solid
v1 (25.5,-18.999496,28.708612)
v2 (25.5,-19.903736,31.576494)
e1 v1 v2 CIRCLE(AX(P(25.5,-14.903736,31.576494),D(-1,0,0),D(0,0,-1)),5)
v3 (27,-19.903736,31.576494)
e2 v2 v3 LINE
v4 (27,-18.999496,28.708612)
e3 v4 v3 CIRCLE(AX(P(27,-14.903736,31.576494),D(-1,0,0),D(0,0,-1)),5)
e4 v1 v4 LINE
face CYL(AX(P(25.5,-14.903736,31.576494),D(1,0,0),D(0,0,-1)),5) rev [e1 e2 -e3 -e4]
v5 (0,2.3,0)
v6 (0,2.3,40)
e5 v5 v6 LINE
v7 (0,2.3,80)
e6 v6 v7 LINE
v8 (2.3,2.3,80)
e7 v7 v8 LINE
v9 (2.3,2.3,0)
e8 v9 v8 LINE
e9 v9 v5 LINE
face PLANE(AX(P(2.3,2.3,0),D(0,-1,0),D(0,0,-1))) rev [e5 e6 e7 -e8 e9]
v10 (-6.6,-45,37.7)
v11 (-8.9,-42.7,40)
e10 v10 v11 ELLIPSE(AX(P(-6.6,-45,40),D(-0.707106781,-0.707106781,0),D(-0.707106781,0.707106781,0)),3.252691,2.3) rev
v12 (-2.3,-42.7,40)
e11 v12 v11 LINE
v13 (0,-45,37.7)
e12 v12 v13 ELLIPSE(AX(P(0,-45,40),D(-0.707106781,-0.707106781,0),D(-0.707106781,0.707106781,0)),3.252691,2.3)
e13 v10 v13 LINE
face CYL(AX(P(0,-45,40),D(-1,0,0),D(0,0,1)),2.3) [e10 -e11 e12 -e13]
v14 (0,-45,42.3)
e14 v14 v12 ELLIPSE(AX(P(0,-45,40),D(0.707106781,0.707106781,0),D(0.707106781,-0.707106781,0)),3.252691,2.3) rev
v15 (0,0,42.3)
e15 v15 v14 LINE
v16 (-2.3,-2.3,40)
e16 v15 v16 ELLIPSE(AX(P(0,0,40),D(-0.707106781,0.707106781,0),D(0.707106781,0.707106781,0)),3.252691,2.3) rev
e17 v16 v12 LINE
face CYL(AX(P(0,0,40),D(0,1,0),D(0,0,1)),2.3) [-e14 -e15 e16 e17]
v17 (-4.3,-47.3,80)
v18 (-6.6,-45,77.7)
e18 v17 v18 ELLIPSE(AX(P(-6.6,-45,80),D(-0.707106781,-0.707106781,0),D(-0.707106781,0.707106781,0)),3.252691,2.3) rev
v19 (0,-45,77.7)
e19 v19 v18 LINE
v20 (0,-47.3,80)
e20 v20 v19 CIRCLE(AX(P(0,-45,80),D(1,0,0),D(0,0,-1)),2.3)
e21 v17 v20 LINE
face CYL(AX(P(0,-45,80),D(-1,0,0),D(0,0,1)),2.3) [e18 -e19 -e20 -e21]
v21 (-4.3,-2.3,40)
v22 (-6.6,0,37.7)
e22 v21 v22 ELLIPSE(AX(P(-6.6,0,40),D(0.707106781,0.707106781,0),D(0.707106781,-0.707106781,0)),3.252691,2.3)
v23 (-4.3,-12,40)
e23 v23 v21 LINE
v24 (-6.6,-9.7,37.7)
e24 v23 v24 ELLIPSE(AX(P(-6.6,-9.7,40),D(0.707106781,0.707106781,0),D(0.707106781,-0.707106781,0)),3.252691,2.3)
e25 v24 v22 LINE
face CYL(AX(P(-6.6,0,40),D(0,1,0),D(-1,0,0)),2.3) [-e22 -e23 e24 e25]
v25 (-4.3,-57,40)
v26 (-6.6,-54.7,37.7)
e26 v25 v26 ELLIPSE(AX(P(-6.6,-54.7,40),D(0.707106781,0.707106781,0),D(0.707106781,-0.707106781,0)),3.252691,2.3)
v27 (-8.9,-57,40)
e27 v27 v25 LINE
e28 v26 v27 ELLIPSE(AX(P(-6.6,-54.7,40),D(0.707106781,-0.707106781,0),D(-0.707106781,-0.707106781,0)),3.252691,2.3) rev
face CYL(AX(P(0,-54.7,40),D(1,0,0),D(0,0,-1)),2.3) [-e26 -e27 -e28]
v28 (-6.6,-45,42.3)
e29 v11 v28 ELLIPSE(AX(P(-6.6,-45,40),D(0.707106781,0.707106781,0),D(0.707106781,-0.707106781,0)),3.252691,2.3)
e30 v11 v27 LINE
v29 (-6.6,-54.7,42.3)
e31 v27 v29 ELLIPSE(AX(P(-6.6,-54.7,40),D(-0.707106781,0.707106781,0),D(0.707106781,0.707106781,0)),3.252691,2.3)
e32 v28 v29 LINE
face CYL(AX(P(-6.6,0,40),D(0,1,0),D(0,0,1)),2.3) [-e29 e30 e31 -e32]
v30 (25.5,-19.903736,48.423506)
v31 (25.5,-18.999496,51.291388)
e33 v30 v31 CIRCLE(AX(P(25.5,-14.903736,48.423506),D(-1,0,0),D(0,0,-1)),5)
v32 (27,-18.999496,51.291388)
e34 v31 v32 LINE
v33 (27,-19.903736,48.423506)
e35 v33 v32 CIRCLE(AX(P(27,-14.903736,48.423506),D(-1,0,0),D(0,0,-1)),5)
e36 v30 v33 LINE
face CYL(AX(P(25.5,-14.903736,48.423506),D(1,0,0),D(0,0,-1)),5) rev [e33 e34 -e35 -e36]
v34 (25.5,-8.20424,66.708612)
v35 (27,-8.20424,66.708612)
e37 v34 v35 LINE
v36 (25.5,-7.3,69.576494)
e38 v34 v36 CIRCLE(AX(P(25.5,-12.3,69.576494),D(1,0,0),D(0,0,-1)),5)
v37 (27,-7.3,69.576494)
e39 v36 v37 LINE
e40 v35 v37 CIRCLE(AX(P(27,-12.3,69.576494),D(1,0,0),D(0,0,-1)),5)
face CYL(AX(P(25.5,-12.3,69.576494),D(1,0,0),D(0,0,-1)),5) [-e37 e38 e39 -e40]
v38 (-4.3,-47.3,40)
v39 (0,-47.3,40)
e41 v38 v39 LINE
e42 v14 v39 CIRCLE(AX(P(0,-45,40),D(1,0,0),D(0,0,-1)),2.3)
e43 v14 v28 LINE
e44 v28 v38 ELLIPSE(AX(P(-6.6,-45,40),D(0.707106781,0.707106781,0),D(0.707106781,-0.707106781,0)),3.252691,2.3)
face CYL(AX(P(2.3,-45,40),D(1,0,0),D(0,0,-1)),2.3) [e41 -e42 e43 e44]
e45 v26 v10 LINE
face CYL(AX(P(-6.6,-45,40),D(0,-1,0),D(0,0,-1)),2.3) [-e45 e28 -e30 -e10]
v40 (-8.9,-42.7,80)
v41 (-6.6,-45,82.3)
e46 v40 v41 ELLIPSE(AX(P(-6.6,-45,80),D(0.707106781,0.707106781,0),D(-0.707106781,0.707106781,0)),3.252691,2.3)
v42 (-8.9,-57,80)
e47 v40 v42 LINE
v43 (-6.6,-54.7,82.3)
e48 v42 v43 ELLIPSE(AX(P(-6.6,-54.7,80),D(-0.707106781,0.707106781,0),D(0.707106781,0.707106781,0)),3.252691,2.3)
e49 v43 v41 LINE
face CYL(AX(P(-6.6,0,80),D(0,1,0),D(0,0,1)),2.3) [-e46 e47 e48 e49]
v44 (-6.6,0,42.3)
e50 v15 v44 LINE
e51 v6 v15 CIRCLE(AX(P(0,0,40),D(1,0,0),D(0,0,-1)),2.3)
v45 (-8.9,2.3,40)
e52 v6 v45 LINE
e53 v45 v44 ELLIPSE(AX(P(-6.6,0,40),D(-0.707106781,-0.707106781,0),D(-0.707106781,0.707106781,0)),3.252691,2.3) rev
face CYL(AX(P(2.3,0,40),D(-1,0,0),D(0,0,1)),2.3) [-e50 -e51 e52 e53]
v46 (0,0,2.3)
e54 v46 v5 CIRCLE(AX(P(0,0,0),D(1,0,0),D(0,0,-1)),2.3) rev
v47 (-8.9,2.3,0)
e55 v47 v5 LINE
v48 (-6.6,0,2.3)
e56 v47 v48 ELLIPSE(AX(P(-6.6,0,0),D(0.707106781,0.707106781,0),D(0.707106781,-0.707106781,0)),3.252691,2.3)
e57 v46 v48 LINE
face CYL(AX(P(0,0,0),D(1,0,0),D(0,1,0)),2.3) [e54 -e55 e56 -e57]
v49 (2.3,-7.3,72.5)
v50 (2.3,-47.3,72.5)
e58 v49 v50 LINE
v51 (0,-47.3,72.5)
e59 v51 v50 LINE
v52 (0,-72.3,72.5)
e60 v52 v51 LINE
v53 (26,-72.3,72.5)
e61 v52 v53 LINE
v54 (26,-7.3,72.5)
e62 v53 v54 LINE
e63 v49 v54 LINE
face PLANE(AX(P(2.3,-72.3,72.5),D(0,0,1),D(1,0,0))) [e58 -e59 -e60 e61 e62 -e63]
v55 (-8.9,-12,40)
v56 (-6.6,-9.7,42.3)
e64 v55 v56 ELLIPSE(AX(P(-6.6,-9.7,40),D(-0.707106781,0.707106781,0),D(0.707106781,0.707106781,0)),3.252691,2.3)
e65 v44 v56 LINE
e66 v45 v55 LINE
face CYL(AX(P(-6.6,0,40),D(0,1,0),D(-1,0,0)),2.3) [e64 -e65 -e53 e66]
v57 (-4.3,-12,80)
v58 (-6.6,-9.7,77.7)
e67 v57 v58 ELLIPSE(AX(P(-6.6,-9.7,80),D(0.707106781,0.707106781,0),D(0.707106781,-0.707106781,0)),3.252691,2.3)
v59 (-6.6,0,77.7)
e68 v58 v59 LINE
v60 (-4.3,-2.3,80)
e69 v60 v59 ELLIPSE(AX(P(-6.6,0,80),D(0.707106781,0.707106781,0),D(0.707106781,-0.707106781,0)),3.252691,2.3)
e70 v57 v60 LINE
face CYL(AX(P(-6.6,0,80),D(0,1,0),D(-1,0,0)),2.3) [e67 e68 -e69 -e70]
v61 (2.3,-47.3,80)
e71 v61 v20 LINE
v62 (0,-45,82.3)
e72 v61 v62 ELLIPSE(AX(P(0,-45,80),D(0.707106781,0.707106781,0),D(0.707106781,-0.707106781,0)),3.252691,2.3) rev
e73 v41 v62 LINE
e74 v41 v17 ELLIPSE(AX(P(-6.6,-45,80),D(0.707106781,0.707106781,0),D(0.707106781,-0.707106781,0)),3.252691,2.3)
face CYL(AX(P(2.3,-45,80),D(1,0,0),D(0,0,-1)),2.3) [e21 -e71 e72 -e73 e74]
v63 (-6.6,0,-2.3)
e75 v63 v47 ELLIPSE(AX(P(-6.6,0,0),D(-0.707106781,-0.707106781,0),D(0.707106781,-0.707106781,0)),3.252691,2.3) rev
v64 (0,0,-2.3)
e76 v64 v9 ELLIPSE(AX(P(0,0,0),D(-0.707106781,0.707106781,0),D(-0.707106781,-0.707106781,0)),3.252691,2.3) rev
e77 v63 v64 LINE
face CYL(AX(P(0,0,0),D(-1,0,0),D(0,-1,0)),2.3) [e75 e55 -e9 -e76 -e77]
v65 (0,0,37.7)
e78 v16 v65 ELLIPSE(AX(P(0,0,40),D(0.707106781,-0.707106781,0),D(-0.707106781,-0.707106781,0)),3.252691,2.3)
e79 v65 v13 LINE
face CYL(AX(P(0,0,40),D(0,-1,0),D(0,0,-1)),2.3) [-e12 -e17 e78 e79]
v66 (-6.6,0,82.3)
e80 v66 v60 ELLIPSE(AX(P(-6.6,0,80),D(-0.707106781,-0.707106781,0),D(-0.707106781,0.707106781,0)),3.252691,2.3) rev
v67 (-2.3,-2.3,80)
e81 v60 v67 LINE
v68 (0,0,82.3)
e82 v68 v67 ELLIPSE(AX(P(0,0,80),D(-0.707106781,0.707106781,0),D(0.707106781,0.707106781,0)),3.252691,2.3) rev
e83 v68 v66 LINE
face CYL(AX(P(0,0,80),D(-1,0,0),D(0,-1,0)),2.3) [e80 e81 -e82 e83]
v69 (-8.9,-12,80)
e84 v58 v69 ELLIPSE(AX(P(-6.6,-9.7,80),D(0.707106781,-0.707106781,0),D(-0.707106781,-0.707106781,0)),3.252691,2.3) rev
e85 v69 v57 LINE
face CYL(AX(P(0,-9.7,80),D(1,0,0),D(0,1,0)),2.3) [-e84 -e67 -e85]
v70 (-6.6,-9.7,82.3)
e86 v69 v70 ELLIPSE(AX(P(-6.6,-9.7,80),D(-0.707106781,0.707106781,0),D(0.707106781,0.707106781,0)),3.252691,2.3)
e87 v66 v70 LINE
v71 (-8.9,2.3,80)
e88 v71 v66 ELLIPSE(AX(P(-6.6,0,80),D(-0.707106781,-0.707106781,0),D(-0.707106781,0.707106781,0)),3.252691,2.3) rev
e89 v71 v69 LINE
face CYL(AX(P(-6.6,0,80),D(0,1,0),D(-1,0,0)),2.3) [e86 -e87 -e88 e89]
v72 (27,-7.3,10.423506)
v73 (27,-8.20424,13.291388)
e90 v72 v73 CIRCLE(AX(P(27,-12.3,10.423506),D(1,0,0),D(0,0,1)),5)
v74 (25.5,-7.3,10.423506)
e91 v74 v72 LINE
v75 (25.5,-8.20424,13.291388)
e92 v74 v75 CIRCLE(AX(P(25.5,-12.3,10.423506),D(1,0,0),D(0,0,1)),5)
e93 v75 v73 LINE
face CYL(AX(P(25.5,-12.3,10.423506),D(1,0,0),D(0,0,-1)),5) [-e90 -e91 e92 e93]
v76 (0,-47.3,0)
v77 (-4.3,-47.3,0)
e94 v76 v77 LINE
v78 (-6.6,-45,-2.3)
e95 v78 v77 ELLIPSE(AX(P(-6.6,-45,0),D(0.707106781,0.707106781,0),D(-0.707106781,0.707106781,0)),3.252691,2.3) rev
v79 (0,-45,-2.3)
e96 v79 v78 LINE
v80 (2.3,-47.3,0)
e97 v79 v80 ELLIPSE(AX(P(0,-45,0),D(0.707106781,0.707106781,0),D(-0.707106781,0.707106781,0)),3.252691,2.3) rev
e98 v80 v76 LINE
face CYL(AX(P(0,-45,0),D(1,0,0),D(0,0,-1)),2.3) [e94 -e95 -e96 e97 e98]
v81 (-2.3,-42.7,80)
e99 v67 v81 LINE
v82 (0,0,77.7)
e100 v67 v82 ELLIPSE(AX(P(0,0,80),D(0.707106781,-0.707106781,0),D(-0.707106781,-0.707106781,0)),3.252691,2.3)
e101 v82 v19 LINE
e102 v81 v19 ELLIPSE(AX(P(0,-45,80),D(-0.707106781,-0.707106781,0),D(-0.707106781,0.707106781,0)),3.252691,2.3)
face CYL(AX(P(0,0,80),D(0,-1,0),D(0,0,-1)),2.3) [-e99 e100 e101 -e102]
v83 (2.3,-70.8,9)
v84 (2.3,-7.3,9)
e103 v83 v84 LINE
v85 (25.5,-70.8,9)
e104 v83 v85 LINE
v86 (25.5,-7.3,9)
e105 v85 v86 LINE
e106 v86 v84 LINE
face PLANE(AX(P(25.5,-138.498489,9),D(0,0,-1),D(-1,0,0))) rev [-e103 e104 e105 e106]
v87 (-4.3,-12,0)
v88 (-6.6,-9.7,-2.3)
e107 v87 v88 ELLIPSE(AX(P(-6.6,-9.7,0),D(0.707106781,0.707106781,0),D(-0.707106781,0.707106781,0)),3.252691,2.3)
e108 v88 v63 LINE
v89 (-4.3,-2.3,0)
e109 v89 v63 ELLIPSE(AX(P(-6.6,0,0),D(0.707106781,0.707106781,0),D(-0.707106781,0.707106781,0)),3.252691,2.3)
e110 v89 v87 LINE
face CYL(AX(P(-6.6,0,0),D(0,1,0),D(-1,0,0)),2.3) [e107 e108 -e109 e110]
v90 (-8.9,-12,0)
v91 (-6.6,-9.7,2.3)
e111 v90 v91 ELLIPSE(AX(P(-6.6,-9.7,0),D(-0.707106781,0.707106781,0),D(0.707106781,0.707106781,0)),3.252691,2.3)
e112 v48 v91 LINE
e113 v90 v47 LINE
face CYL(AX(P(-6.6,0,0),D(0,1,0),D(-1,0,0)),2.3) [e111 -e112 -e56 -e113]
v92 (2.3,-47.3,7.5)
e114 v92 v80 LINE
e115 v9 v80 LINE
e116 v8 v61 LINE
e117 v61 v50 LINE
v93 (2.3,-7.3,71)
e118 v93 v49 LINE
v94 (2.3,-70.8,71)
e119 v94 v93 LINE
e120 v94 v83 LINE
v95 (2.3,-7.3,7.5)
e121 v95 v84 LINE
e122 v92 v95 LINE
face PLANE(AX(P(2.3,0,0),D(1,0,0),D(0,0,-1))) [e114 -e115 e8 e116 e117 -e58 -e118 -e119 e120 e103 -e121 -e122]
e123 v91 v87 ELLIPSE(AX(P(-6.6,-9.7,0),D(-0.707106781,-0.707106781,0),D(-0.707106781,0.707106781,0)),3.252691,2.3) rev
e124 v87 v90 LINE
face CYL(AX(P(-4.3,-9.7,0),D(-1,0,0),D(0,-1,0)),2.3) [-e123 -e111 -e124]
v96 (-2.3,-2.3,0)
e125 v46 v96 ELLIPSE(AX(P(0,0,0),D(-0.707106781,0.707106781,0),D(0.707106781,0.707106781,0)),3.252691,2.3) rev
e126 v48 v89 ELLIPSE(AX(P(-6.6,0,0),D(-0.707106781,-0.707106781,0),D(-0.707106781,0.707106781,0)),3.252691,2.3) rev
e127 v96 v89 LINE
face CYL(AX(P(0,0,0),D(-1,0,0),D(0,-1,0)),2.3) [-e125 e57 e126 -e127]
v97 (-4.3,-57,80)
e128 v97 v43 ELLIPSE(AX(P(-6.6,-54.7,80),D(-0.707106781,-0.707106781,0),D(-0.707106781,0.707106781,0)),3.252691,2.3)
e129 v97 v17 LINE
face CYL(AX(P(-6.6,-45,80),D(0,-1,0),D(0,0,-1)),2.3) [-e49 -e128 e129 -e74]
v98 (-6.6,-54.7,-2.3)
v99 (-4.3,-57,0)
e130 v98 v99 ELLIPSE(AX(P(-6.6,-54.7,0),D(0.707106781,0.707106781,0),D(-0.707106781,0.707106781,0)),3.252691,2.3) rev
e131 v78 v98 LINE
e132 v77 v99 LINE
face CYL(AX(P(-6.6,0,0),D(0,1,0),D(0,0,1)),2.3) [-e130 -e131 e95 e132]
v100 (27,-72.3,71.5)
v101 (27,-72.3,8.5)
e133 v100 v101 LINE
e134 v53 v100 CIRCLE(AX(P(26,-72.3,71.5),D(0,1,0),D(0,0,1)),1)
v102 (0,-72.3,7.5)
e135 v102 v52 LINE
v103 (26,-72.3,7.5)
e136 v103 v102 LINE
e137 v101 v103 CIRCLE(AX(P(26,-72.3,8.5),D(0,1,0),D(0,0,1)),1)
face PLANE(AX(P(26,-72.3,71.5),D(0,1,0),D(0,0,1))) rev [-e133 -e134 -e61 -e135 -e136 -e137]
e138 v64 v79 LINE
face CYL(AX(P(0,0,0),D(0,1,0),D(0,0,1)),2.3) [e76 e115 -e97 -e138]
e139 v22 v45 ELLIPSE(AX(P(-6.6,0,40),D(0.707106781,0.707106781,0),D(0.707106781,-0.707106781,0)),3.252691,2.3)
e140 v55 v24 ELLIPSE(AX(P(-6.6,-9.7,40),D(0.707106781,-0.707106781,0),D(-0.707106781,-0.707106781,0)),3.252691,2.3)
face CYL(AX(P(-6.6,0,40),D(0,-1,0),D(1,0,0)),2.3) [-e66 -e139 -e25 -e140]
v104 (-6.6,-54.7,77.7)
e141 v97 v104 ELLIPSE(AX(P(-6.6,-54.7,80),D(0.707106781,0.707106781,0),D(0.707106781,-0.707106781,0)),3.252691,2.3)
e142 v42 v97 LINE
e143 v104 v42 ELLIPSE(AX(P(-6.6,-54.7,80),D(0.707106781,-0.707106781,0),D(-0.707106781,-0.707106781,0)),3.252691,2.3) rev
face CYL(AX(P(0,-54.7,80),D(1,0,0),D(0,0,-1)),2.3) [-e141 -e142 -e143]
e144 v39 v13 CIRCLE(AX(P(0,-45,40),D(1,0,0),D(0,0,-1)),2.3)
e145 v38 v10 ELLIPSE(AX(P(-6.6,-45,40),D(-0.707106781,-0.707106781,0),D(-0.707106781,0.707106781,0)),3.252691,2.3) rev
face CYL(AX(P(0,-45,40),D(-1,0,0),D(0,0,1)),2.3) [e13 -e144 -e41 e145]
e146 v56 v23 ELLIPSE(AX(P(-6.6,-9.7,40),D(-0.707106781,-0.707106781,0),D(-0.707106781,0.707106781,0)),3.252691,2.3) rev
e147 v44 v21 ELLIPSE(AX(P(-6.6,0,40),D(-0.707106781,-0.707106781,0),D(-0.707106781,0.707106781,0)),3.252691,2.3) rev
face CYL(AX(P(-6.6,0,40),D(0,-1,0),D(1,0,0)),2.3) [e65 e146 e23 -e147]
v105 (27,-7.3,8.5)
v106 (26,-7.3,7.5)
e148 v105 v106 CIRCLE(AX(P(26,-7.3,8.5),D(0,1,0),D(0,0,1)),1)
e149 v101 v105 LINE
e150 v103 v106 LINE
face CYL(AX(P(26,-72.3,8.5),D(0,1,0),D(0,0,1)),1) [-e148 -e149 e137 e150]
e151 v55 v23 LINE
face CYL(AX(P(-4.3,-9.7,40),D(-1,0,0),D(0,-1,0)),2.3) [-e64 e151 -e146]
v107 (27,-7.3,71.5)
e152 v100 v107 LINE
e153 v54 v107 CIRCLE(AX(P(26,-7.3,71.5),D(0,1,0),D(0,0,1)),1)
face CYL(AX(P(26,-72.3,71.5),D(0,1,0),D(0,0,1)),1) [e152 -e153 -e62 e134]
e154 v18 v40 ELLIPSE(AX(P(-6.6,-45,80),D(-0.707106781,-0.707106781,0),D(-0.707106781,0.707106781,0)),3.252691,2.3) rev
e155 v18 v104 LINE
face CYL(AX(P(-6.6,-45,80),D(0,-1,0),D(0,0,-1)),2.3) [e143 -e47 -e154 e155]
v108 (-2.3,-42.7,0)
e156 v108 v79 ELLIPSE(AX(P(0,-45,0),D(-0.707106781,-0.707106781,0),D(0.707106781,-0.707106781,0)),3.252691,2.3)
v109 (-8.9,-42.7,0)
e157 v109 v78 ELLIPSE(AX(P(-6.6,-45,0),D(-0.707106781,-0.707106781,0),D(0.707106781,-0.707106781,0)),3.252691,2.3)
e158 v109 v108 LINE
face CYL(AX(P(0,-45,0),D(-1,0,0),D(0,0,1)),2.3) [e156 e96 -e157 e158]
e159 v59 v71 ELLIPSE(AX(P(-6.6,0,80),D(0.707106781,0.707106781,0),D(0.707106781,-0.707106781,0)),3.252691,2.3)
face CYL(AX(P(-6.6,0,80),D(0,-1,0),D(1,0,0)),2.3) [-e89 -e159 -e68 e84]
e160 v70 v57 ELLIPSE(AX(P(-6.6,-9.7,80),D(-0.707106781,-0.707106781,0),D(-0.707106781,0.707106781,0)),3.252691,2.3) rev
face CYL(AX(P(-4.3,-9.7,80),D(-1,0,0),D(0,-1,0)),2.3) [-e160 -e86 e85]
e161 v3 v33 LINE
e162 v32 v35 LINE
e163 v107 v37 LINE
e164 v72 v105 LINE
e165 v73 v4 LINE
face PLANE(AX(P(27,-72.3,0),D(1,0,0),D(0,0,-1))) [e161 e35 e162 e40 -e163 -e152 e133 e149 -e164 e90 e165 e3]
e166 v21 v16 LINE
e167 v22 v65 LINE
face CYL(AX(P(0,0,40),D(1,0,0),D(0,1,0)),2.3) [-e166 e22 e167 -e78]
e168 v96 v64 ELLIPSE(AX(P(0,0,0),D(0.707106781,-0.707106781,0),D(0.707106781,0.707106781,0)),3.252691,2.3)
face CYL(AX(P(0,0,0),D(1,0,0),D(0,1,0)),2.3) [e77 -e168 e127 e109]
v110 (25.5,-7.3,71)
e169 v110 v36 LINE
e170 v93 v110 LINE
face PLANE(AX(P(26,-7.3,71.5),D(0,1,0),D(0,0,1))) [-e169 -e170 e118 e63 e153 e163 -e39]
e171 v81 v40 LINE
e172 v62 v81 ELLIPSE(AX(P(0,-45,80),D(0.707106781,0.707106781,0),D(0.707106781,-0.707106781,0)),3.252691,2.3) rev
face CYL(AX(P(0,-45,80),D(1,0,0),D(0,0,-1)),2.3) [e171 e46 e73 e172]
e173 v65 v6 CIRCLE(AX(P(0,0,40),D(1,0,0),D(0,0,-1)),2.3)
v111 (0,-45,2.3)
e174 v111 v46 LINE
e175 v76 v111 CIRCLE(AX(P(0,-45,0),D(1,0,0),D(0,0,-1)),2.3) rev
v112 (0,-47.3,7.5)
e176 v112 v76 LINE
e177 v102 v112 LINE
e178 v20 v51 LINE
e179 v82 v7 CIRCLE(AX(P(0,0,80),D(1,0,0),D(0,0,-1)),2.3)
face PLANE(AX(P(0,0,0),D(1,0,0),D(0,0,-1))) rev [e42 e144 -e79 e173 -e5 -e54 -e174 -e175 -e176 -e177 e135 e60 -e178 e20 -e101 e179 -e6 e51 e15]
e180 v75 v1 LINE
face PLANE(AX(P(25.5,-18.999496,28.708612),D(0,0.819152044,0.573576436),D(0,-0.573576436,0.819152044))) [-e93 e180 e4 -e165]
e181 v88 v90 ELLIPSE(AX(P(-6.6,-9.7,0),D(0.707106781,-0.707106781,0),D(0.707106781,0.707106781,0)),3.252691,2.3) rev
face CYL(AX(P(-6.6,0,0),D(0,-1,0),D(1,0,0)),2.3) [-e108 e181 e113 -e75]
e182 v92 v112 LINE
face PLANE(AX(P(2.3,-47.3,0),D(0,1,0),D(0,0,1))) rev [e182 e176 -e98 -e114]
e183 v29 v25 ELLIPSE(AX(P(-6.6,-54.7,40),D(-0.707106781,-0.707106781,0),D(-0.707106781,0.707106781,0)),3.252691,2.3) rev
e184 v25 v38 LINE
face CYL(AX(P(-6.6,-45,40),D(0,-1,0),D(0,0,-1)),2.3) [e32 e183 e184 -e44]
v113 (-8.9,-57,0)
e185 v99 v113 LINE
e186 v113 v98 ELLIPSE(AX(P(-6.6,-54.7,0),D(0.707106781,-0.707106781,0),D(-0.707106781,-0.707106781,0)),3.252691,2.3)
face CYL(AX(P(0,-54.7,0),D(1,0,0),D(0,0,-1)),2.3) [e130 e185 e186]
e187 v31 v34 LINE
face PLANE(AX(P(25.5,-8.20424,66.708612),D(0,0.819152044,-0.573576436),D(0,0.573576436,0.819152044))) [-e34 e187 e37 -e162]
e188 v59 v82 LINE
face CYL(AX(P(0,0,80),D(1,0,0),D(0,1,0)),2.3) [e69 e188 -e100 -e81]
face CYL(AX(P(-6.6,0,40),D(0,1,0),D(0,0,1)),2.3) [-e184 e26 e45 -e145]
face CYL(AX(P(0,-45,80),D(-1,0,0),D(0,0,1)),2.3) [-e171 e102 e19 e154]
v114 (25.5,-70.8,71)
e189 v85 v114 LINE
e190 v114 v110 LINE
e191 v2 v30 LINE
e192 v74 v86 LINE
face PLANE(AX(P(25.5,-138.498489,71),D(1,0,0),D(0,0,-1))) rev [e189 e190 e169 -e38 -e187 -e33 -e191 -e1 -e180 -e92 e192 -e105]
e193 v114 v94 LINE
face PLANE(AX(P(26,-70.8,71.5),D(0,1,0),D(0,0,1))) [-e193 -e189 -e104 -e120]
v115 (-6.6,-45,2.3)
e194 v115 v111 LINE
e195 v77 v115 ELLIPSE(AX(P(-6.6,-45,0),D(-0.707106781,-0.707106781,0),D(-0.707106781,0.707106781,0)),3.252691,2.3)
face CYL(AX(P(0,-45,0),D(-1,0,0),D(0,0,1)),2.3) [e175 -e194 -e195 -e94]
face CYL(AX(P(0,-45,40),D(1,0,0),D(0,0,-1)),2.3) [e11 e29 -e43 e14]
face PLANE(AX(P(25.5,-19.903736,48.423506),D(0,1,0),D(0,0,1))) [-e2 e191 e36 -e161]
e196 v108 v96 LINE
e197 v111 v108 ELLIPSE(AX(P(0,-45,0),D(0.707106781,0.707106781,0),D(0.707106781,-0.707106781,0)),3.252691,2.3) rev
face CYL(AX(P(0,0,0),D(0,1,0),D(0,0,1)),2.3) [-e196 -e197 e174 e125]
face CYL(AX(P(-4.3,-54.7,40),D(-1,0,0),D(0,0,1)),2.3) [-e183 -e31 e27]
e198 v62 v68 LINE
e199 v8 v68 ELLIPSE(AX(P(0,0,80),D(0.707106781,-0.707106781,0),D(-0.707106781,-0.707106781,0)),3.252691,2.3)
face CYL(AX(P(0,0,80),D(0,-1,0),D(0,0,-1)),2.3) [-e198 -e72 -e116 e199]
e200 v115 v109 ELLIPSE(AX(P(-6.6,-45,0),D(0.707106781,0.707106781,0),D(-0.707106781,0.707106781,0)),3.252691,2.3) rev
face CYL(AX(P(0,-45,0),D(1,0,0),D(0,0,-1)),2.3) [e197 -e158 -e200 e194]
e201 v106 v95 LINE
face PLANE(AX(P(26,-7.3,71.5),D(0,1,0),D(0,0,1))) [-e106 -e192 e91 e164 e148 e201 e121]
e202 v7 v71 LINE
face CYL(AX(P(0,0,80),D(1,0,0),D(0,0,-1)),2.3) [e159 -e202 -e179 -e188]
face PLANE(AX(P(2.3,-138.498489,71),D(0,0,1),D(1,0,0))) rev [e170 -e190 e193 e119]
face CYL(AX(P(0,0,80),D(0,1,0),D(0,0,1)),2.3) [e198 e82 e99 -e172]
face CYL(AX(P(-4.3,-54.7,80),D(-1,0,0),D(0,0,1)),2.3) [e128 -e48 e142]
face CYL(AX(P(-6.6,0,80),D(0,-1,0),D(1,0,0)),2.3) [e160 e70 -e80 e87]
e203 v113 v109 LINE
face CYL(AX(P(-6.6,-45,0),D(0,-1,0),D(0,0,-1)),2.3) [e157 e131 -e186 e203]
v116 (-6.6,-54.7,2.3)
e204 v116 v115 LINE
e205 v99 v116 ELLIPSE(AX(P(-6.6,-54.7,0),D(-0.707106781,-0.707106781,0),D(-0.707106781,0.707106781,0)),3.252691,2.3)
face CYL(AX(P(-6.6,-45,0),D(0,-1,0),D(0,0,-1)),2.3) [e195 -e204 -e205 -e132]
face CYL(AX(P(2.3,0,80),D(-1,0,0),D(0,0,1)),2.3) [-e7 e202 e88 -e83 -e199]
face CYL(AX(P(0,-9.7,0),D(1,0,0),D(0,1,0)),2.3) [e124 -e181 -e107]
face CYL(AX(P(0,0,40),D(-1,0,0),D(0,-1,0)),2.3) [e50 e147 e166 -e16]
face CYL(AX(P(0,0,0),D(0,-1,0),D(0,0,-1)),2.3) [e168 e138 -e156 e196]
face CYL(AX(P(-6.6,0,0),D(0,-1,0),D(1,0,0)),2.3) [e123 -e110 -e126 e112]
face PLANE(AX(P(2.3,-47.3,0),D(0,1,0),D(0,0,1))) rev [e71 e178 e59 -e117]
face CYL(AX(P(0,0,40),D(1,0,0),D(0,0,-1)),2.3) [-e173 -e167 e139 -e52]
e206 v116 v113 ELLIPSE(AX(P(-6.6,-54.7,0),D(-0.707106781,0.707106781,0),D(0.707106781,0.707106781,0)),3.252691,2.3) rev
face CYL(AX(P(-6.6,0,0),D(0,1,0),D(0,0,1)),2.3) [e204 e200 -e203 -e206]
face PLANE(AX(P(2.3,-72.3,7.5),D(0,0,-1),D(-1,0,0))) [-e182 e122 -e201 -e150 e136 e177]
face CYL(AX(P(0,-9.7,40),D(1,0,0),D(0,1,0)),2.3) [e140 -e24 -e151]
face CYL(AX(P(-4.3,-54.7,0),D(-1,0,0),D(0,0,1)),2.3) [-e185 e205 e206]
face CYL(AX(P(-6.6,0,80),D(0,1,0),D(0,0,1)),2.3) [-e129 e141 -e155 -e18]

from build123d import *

# Parameters (mm, degrees)
EXTRU_MINCE1_DEPTH           = 2.3
CONG_1_R                     = 2.3
ESQUISSE2_W                  = 80
ESQUISSE2_H                  = 49.6
BOSS_EXTRU_1_DEPTH           = 2.3
R_P_TITION_START             = 77.7
R_P_TITION_LIN_AIRE1_DEPTH   = 4.6
R_P_TITION_START_2           = 37.7
R_P_TITION_LIN_AIRE1_2_DEPTH = 4.6
CONG_2_R                     = 2.3
BOSS_EXTRU_2_DEPTH           = 40
BOSS_EXTRU_2_DEPTH_BACK      = 25
BOSS_EXTRU_2_START           = -47.3
ESQUISSE5_W                  = 23.2
ESQUISSE5_H                  = 62
ENL_V_MAT_EXTRU_1_DEPTH      = 63.5
ESQUISSE6_OUTSIDE_W          = 110.274
ESQUISSE6_OUTSIDE_H          = 100.274
ENL_V_MAT_EXTRU_2_DEPTH      = 1.5


# Read off the part's stored shape, not the designer's step: Répétition linéaire1
with BuildPart() as part:
    # Esquisse1 → Extru.-Mince1 (new, symmetric)
    with BuildSketch(Plane.XY):
        Polygon((-4.3, -57), (-4.3, -47.3), (2.3, -47.3), (2.3, 2.3), (-8.9, 2.3), (-8.9, -12), (-4.3, -12), (-4.3, -2.3), (-2.3, -2.3), (-2.3, -42.7), (-8.9, -42.7), (-8.9, -57), align=None)
    extrude(amount=EXTRU_MINCE1_DEPTH, both=True)

    # Congé1
    cong_1_edges = [part.edges().sort_by_distance(p)[0] for p in [
        (-6.6, -57, -2.3),
        (-4.3, -52.15, -2.3),
        (-1, -47.3, -2.3),
        (2.3, -22.5, -2.3),
        (-3.3, 2.3, -2.3),
        (-8.9, -4.85, -2.3),
        (-6.6, -12, -2.3),
        (-4.3, -7.15, -2.3),
        (-3.3, -2.3, -2.3),
        (-2.3, -22.5, -2.3),
        (-5.6, -42.7, -2.3),
        (-8.9, -49.85, -2.3),
        (-5.6, -42.7, 2.3),
        (-2.3, -22.5, 2.3),
        (-3.3, -2.3, 2.3),
        (-4.3, -7.15, 2.3),
        (-6.6, -12, 2.3),
        (-8.9, -4.85, 2.3),
        (-3.3, 2.3, 2.3),
        (2.3, -22.5, 2.3),
        (-1, -47.3, 2.3),
        (-4.3, -52.15, 2.3),
        (-6.6, -57, 2.3),
        (-8.9, -49.85, 2.3),
    ]]
    fillet(cong_1_edges, radius=CONG_1_R - 0.0001)  # a hair under: the kernel refuses the full size

    # Esquisse2 → Boss.-Extru.1 (add)
    with BuildSketch(Plane(origin=(0, 0, 0), x_dir=(0, 0, -1), z_dir=(1, 0, 0))):
        with Locations((-40, -22.5)):
            Rectangle(ESQUISSE2_W, ESQUISSE2_H)
    extrude(amount=BOSS_EXTRU_1_DEPTH)

    # Répétition linéaire1 outline → Répétition linéaire1 (add)
    with BuildSketch(Plane.XY.offset(R_P_TITION_START)):
        Polygon((-8.9, 2.3), (-8.9, -12), (-4.3, -12), (-4.3, -2.3), (-2.3, -2.3), (-2.3, -42.7), (-8.9, -42.7), (-8.9, -57), (-4.3, -57), (-4.3, -47.3), (2.3, -47.3), (2.3, 2.3), align=None)
    extrude(amount=R_P_TITION_LIN_AIRE1_DEPTH)

    # R_p_tition lin_aire1 2 outline → R_p_tition lin_aire1 2 (add)
    with BuildSketch(Plane.XY.offset(R_P_TITION_START_2)):
        Polygon((0, 2.3), (-8.9, 2.3), (-8.9, -12), (-4.3, -12), (-4.3, -2.3), (-2.3, -2.3), (-2.3, -42.7), (-8.9, -42.7), (-8.9, -57), (-4.3, -57), (-4.3, -47.3), (0, -47.3), align=None)
    extrude(amount=R_P_TITION_LIN_AIRE1_2_DEPTH)

    # Congé2
    cong_2_edges = [part.edges().sort_by_distance(p)[0] for p in [
        (2.3, -22.5, 82.3),
        (-1, -47.3, 82.3),
        (-3.3, 2.3, 82.3),
        (-4.45, 2.3, 77.7),
        (-2.15, -47.3, 77.7),
        (-4.3, -52.15, 77.7),
        (-6.6, -57, 77.7),
        (-6.6, -12, 77.7),
        (-8.9, -4.85, 77.7),
        (-8.9, -49.85, 77.7),
        (-6.6, -57, 82.3),
        (-4.3, -52.15, 82.3),
        (-8.9, -4.85, 82.3),
        (-6.6, -12, 82.3),
        (-4.3, -7.15, 77.7),
        (-3.3, -2.3, 77.7),
        (-2.3, -22.5, 77.7),
        (-5.6, -42.7, 77.7),
        (-8.9, -49.85, 82.3),
        (-4.3, -7.15, 82.3),
        (-3.3, -2.3, 82.3),
        (-2.3, -22.5, 82.3),
        (-5.6, -42.7, 82.3),
        (-2.15, -47.3, 42.3),
        (-4.45, 2.3, 42.3),
        (-4.3, -7.15, 42.3),
        (-3.3, -2.3, 42.3),
        (-2.3, -22.5, 42.3),
        (-5.6, -42.7, 42.3),
        (-8.9, -49.85, 42.3),
        (-4.45, 2.3, 37.7),
        (-2.15, -47.3, 37.7),
        (-4.3, -52.15, 37.7),
        (-6.6, -57, 37.7),
        (-6.6, -12, 37.7),
        (-8.9, -4.85, 37.7),
        (-8.9, -49.85, 37.7),
        (-6.6, -57, 42.3),
        (-4.3, -52.15, 42.3),
        (-8.9, -4.85, 42.3),
        (-6.6, -12, 42.3),
        (-4.3, -7.15, 37.7),
        (-3.3, -2.3, 37.7),
        (-2.3, -22.5, 37.7),
        (-5.6, -42.7, 37.7),
    ]]
    fillet(cong_2_edges, radius=CONG_2_R - 0.0001)  # a hair under: the kernel refuses the full size

    # Esquisse4 → Boss.-Extru.2 (add, two sides: drawn at the far end of the back side and taken through both)
    with BuildSketch(Plane(origin=(0, 0, 0), x_dir=(1, 0, 0), z_dir=(0, 1, 0)).offset(BOSS_EXTRU_2_START - BOSS_EXTRU_2_DEPTH_BACK)):
        with BuildLine():
            Line((0, -72.5), (26, -72.5))
            ThreePointArc((26, -72.5), (26.707106781, -72.207106781), (27, -71.5))
            Line((27, -71.5), (27, -8.5))
            ThreePointArc((27, -8.5), (26.707106781, -7.792893219), (26, -7.5))
            Line((26, -7.5), (0, -7.5))
            Line((0, -7.5), (0, -72.5))
        make_face()
    extrude(amount=BOSS_EXTRU_2_DEPTH + BOSS_EXTRU_2_DEPTH_BACK)

    # Esquisse5 → Enlèv. mat.-Extru.1 (cut)
    with BuildSketch(Plane(origin=(0, -7.3, 0), x_dir=(1, 0, 0), z_dir=(0, 1, 0))):
        with Locations((13.9, -40)):
            Rectangle(ESQUISSE5_W, ESQUISSE5_H)
    extrude(amount=-ENL_V_MAT_EXTRU_1_DEPTH, mode=Mode.SUBTRACT)

    # Esquisse6 outside → Enlèv. mat.-Extru.2 (cut)
    with BuildSketch(Plane(origin=(27, 0, 0), x_dir=(0, 0, -1), z_dir=(1, 0, 0))):
        with Locations((-40, -35)):
            Rectangle(ESQUISSE6_OUTSIDE_W, ESQUISSE6_OUTSIDE_H)
        with BuildLine():
            Line((-66.708611763, -8.204239779), (-51.291388237, -18.999495909))
            ThreePointArc((-51.291388237, -18.999495909), (-49.927035053, -19.672320442), (-48.423506056, -19.903735688))
            Line((-48.423506056, -19.903735688), (-31.576493944, -19.903735688))
            ThreePointArc((-31.576493944, -19.903735688), (-30.072964947, -19.672320442), (-28.708611763, -18.999495909))
            Line((-28.708611763, -18.999495909), (-13.291388237, -8.204239779))
            ThreePointArc((-13.291388237, -8.204239779), (-11.927035053, -7.531415246), (-10.423506056, -7.3))
            Line((-10.423506056, -7.3), (-7.5, -7.3))
            Line((-7.5, -7.3), (-7.5, -72.3))
            Line((-7.5, -72.3), (-72.5, -72.3))
            Line((-72.5, -72.3), (-72.5, -7.3))
            Line((-72.5, -7.3), (-69.576493944, -7.3))
            ThreePointArc((-69.576493944, -7.3), (-68.072964947, -7.531415246), (-66.708611763, -8.204239779))
        make_face(mode=Mode.SUBTRACT)
    extrude(amount=-ENL_V_MAT_EXTRU_2_DEPTH, mode=Mode.SUBTRACT)


solid = part.part
